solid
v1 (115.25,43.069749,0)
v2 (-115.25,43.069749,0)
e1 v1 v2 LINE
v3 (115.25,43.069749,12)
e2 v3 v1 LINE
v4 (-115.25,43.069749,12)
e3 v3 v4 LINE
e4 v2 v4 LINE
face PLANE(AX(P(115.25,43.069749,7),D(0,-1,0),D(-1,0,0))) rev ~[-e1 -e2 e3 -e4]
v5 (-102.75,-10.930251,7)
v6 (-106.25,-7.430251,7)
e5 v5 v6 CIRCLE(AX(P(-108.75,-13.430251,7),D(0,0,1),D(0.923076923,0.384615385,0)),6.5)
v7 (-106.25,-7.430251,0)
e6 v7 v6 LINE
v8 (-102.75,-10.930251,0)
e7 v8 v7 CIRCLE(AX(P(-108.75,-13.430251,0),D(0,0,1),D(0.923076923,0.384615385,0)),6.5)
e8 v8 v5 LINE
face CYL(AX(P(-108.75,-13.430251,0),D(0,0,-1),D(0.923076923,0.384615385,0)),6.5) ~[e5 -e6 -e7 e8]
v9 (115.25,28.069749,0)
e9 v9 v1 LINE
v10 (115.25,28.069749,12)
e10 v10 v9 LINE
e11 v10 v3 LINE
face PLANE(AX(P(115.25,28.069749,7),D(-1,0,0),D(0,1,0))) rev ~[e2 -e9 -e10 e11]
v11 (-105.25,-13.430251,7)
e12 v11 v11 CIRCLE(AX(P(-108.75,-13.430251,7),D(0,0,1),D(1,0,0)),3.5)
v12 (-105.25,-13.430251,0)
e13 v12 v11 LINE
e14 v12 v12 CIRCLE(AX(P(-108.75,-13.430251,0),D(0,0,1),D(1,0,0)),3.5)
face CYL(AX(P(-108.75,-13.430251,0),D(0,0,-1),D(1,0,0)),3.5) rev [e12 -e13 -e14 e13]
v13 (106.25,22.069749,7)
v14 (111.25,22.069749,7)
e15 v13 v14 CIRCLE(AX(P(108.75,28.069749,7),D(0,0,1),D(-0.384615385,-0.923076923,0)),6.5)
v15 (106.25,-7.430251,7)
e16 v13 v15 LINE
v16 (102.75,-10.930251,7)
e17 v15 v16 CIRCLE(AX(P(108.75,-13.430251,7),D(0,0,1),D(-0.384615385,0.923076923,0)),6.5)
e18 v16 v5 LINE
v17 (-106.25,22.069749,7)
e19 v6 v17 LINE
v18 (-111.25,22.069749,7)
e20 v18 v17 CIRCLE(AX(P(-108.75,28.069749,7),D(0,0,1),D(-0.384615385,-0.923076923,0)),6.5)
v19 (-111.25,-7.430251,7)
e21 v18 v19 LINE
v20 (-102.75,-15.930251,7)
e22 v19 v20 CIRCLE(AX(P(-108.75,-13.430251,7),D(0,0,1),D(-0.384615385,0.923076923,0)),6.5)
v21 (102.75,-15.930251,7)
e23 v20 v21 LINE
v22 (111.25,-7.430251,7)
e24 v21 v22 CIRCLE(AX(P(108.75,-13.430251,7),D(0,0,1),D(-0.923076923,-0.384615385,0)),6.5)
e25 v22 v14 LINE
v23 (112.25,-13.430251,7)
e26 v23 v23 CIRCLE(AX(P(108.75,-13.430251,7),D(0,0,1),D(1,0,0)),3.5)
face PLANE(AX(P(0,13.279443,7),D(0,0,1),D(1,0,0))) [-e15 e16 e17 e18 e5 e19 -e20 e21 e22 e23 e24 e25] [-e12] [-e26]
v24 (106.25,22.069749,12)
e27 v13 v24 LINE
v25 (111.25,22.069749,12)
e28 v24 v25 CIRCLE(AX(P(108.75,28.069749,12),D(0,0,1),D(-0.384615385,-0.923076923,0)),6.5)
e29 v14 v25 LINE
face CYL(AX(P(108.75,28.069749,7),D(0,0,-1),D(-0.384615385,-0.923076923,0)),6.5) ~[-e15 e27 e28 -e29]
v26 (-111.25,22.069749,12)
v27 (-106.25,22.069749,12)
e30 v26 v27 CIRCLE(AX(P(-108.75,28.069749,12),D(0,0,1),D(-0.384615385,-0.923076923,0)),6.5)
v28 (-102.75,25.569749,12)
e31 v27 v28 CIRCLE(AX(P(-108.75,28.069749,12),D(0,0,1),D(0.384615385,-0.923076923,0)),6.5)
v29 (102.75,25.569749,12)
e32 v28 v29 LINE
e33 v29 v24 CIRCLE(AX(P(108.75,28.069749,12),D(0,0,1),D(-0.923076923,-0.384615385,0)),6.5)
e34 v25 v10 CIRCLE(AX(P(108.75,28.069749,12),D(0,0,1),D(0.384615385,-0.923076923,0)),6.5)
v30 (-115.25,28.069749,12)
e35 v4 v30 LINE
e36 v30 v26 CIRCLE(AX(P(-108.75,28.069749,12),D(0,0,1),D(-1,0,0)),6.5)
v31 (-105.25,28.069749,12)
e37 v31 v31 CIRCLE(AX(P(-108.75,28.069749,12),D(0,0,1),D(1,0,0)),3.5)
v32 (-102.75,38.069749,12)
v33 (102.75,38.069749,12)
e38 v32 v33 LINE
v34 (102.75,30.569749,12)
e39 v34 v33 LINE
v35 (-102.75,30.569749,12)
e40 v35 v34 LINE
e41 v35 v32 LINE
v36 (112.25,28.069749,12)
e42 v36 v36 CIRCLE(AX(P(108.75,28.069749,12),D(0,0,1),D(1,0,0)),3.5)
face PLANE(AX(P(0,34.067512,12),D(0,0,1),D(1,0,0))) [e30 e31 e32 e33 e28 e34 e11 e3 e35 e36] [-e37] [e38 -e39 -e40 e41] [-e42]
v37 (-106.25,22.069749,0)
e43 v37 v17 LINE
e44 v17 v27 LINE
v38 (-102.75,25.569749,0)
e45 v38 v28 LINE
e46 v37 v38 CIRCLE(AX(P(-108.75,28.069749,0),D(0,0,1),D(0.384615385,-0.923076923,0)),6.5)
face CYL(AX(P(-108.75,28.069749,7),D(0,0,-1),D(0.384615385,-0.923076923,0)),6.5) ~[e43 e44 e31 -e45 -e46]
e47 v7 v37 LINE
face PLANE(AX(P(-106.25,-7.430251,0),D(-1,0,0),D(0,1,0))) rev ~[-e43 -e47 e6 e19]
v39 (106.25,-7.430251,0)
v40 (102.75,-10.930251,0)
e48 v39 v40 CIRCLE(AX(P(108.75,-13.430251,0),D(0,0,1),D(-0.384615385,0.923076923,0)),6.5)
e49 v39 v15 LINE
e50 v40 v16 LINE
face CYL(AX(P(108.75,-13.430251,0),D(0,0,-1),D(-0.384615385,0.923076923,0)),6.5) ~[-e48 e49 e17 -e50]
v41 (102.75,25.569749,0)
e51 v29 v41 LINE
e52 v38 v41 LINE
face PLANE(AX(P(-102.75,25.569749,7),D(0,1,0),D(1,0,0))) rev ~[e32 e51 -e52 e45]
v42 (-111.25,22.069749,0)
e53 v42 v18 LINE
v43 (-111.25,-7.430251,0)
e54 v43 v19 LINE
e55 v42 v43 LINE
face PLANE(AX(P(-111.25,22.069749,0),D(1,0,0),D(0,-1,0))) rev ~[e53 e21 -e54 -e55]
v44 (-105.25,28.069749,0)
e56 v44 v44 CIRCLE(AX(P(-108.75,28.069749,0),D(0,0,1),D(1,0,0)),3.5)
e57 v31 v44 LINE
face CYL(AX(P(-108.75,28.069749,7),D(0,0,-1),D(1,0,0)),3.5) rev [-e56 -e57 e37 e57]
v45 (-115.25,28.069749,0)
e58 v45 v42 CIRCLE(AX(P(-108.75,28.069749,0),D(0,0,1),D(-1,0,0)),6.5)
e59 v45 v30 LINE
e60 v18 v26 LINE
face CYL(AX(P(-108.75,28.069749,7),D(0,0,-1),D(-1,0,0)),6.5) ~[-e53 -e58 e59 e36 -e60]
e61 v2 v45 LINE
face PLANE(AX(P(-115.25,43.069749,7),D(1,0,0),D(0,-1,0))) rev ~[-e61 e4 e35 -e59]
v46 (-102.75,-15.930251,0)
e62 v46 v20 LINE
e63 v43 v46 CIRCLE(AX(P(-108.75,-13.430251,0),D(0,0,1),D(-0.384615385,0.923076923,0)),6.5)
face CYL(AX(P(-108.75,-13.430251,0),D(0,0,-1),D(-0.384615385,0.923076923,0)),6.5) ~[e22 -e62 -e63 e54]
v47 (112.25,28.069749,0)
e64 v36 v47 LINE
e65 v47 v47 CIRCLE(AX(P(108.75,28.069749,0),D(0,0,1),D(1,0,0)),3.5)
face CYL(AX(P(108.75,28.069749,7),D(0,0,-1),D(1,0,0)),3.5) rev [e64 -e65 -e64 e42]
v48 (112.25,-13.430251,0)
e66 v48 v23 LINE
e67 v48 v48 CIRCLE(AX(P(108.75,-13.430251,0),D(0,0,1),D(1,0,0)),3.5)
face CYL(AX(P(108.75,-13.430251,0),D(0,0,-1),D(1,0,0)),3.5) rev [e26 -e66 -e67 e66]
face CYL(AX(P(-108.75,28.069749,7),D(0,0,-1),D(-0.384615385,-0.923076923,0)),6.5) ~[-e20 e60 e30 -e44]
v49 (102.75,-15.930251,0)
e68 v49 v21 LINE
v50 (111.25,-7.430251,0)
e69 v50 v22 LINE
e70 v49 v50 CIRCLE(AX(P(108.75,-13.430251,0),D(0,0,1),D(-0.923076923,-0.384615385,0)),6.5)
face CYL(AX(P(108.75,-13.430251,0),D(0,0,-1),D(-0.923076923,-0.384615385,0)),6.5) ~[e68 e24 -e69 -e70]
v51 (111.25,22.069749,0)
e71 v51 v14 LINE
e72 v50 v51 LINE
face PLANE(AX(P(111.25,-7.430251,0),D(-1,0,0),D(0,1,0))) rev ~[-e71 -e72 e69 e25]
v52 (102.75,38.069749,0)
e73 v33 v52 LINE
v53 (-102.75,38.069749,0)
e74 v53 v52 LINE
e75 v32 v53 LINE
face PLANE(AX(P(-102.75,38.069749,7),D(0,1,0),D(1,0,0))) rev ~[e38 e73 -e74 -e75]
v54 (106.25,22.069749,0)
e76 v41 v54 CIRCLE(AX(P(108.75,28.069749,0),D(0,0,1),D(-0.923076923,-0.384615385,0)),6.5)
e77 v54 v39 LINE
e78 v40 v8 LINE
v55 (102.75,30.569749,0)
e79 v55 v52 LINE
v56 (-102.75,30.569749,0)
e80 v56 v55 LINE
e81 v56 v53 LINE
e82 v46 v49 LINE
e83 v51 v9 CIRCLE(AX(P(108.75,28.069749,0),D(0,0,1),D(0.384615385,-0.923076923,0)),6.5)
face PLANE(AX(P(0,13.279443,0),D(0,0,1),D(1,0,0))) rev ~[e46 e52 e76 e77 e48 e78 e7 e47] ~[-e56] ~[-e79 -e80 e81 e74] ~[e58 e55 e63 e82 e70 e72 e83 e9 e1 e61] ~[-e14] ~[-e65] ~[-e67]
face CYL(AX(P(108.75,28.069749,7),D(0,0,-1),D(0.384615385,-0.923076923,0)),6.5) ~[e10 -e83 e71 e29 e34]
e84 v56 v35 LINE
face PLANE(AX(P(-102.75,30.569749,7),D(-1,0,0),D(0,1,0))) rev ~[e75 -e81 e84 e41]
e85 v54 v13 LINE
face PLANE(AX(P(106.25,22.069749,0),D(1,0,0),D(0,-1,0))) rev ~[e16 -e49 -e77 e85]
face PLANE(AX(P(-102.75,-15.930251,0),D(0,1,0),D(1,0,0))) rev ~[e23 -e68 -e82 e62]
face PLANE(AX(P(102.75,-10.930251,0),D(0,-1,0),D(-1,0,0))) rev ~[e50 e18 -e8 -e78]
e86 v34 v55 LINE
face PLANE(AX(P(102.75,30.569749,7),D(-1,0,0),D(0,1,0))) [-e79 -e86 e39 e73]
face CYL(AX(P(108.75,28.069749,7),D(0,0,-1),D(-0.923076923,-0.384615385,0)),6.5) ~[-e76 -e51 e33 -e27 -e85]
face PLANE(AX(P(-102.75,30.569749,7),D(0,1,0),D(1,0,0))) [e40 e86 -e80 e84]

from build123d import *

# Parameters (mm, degrees)
F0_R     = 3.5
F0_W     = 205.5
F0_H     = 7.5
F1_DEPTH = 7
F2_R     = 3.5
F2_W     = 205.5
F2_H     = 7.5
F3_DEPTH = 5


# Not quite as in the source:
# - a feature of the source that left no trace in its solid (it failed there, or was rolled back) is left out


with BuildPart() as f1:
    # F0 (on Top) → F1 (new body)
    with BuildSketch(Plane.XY):
        with BuildLine():
            Line((-115.25, 43.0697486343), (-115.25, 28.0697486343))
            ThreePointArc((-115.25, 28.0697486343), (-114.1583269132, 24.4641973588), (-111.25, 22.0697486343))
            Line((-111.25, 22.0697486343), (-111.25, -7.4302513657))
            ThreePointArc((-111.25, -7.4302513657), (-113.3461940777, -18.0264454434), (-102.75, -15.9302513657))
            Line((-102.75, -15.9302513657), (102.75, -15.9302513657))
            ThreePointArc((102.75, -15.9302513657), (113.3461940777, -18.0264454434), (111.25, -7.4302513657))
            Line((111.25, -7.4302513657), (111.25, 22.0697486343))
            ThreePointArc((111.25, 22.0697486343), (114.1583269132, 24.4641973588), (115.25, 28.0697486343))
            Line((115.25, 28.0697486343), (115.25, 43.0697486343))
            Line((115.25, 43.0697486343), (-115.25, 43.0697486343))
        make_face()
        with Locations((-108.75, -13.4302513657)):
            Circle(F0_R, mode=Mode.SUBTRACT)
        with Locations((108.75, -13.4302513657)):
            Circle(F0_R, mode=Mode.SUBTRACT)
        with BuildLine():
            Line((-102.75, 25.5697486343), (102.75, 25.5697486343))
            ThreePointArc((102.75, 25.5697486343), (104.1538059223, 23.4735545566), (106.25, 22.0697486343))
            Line((106.25, 22.0697486343), (106.25, -7.4302513657))
            ThreePointArc((106.25, -7.4302513657), (104.1538059223, -8.834057288), (102.75, -10.9302513657))
            Line((102.75, -10.9302513657), (-102.75, -10.9302513657))
            ThreePointArc((-102.75, -10.9302513657), (-104.1538059223, -8.834057288), (-106.25, -7.4302513657))
            Line((-106.25, -7.4302513657), (-106.25, 22.0697486343))
            ThreePointArc((-106.25, 22.0697486343), (-104.1538059223, 23.4735545566), (-102.75, 25.5697486343))
        make_face(mode=Mode.SUBTRACT)
        with Locations((-108.75, 28.0697486343)):
            Circle(F0_R, mode=Mode.SUBTRACT)
        with Locations((0, 34.3197486343)):
            Rectangle(F0_W, F0_H, mode=Mode.SUBTRACT)
        with Locations((108.75, 28.0697486343)):
            Circle(F0_R, mode=Mode.SUBTRACT)
    extrude(amount=F1_DEPTH)

    # F2 (on face) → F3 (join)
    with BuildSketch(Plane.XY.offset(7)):
        with BuildLine():
            Line((115.25, 43.0697486343), (-115.25, 43.0697486343))
            Line((-115.25, 43.0697486343), (-115.25, 28.0697486343))
            ThreePointArc((-115.25, 28.0697486343), (-114.1583269132, 24.4641973588), (-111.25, 22.0697486343))
            ThreePointArc((-111.25, 22.0697486343), (-108.75, 21.5697486343), (-106.25, 22.0697486343))
            ThreePointArc((-106.25, 22.0697486343), (-104.1538059223, 23.4735545566), (-102.75, 25.5697486343))
            Line((-102.75, 25.5697486343), (102.75, 25.5697486343))
            ThreePointArc((102.75, 25.5697486343), (104.1538059223, 23.4735545566), (106.25, 22.0697486343))
            ThreePointArc((106.25, 22.0697486343), (108.75, 21.5697486343), (111.25, 22.0697486343))
            ThreePointArc((111.25, 22.0697486343), (114.1583269132, 24.4641973588), (115.25, 28.0697486343))
            Line((115.25, 28.0697486343), (115.25, 43.0697486343))
        make_face()
        with Locations((-108.75, 28.0697486343)):
            Circle(F2_R, mode=Mode.SUBTRACT)
        with Locations((108.75, 28.0697486343)):
            Circle(F2_R, mode=Mode.SUBTRACT)
        with Locations((0, 34.3197486343)):
            Rectangle(F2_W, F2_H, mode=Mode.SUBTRACT)
    extrude(amount=F3_DEPTH)


solid = f1.part
